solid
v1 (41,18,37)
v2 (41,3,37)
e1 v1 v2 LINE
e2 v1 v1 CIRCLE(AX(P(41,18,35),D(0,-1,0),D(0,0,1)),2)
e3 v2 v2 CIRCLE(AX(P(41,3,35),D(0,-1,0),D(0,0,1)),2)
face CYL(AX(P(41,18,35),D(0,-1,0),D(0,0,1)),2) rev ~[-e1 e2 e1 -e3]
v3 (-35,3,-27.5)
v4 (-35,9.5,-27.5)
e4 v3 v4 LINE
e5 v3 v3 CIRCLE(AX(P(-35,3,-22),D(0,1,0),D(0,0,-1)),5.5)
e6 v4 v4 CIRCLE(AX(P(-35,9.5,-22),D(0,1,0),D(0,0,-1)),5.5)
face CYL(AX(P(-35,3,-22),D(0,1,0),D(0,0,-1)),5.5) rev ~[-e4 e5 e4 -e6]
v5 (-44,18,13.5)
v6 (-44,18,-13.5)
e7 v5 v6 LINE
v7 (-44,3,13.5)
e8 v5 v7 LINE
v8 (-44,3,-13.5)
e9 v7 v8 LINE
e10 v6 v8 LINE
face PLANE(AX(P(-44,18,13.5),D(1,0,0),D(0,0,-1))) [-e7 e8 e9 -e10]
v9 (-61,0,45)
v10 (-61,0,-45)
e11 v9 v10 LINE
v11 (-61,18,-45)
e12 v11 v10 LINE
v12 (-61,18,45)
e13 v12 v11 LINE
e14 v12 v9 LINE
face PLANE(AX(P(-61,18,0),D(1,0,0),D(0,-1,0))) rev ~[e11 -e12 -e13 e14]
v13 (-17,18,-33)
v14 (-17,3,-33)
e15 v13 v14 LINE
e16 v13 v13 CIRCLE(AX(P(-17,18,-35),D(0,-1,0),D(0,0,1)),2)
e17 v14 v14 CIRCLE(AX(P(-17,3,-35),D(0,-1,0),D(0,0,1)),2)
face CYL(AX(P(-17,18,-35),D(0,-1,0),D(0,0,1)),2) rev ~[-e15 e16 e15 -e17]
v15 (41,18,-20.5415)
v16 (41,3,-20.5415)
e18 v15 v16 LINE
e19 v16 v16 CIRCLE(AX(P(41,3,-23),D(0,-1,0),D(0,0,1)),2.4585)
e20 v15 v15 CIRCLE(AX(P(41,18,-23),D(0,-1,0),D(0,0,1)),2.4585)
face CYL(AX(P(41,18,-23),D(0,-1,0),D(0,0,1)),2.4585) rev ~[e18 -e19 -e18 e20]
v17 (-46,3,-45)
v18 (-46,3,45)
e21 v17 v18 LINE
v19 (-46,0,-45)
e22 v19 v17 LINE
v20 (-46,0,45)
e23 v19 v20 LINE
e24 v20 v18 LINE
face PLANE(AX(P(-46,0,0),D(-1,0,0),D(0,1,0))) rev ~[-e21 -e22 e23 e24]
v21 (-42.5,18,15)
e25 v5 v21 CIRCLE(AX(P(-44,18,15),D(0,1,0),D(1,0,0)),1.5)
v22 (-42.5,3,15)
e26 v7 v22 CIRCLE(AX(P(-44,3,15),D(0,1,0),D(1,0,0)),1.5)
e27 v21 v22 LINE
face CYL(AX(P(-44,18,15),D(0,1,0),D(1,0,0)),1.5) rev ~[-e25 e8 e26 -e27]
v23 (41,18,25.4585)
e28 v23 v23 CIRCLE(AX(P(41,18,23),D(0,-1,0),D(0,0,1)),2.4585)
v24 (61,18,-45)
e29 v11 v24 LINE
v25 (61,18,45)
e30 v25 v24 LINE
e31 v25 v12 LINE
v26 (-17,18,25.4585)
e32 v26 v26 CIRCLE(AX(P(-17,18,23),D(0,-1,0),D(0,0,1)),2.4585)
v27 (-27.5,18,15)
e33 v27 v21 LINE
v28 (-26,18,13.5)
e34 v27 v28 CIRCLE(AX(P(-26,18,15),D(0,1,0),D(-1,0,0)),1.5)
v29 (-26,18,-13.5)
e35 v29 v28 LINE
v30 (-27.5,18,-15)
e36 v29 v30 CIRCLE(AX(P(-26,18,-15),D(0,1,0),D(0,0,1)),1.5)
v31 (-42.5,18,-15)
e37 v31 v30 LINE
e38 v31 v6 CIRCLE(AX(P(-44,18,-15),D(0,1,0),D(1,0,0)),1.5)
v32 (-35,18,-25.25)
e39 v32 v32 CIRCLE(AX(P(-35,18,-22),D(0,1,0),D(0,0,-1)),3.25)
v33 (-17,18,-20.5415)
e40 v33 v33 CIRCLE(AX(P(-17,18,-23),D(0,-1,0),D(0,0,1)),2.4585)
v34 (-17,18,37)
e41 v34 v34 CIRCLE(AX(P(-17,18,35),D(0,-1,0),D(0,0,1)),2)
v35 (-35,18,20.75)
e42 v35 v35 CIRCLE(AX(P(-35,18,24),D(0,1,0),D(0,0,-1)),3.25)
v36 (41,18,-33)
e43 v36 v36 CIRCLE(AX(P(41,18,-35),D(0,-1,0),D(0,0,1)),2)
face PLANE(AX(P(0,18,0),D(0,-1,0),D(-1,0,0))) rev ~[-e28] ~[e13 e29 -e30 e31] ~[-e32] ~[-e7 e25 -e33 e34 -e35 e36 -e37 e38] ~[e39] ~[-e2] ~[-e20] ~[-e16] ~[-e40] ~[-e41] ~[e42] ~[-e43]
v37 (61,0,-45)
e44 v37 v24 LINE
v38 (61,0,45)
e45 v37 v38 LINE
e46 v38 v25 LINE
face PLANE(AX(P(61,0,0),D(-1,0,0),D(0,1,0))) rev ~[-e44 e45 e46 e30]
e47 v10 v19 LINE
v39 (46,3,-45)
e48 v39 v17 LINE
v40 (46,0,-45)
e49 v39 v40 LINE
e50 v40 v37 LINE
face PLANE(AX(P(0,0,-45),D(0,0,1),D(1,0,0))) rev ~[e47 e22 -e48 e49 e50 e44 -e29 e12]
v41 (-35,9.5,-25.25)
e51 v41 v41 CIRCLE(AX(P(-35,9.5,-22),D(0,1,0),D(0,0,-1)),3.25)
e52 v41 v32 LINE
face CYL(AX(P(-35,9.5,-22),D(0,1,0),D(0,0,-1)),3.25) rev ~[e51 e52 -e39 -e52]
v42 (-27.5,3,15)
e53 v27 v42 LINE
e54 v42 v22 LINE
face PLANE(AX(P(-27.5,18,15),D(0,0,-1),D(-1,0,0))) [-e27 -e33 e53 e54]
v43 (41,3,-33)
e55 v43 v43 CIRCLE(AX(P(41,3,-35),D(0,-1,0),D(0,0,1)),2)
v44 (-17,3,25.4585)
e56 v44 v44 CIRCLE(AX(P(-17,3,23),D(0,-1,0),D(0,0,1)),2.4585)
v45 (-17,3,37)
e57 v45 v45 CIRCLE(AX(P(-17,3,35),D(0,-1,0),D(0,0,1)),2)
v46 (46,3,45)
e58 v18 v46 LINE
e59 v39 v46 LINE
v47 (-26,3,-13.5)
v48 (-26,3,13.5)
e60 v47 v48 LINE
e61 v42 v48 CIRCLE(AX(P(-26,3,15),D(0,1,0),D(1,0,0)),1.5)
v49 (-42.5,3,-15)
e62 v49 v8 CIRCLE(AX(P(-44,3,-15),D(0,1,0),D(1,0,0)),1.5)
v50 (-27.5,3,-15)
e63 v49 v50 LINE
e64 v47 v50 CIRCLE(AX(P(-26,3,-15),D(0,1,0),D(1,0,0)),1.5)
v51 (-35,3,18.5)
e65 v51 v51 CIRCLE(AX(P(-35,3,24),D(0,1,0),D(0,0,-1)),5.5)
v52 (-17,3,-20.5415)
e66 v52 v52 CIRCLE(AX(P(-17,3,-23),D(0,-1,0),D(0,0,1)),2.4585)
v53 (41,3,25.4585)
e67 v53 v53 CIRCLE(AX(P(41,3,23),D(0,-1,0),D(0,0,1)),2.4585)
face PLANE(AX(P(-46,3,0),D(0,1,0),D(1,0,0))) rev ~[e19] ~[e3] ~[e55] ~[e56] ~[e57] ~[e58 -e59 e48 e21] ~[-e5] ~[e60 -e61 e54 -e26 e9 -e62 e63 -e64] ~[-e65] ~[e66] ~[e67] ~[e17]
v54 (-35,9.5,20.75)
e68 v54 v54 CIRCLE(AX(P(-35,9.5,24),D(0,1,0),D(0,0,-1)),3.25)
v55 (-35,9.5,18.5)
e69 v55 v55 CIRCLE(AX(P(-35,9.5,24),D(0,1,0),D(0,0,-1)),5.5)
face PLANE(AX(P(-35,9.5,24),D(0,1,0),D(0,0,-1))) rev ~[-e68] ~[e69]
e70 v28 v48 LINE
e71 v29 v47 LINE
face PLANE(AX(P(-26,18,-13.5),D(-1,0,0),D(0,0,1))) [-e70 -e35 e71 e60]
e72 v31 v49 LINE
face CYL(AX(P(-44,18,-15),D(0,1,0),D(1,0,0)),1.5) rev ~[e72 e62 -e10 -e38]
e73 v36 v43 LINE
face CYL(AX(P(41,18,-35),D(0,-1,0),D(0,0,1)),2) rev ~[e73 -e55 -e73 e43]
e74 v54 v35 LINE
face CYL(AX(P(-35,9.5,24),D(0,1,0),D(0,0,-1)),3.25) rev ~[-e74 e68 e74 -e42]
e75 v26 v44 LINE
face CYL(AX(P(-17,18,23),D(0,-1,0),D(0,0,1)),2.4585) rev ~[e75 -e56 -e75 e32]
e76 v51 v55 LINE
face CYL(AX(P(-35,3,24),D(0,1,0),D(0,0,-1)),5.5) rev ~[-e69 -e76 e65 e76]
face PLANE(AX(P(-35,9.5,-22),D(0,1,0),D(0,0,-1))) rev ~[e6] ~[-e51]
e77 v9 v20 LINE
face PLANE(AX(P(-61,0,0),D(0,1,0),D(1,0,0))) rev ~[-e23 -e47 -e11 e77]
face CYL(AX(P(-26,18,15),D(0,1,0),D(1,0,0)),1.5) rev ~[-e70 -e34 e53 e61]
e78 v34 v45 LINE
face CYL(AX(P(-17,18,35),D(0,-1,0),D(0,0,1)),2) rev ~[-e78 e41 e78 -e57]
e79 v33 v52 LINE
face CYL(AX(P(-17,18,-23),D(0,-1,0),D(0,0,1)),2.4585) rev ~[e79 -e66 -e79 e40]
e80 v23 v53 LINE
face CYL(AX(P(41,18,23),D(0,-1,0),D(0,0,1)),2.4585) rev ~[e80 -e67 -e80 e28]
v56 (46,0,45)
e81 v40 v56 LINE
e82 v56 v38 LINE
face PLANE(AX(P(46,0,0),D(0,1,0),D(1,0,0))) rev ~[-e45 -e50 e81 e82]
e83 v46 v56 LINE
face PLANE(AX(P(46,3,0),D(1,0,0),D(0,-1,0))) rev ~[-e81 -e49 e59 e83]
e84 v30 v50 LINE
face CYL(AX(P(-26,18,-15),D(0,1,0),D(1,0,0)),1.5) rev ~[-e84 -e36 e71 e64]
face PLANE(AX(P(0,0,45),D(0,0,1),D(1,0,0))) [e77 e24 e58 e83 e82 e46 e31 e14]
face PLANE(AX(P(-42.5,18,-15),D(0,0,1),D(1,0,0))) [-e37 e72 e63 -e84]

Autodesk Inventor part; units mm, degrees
ref_plane "YZ Plane" through (0, 0, 0) normal (1, 0, 0) x (0, 1, 0)
ref_plane "XZ Plane" through (0, 0, 0) normal (0, 1, 0) x (-1, 0, 0)
ref_plane "XY Plane" through (0, 0, 0) normal (0, 0, 1) x (1, 0, 0)
sketch "Schizzo3" plane through (0, 0, 0) normal (0, 0, 1) x (1, 0, 0)
  line L0 (-46, 0) -> (-46, 3)
  line L1 (-46, 3) -> (46, 3)
  line L2 (46, 3) -> (46, 0)
  line L3 (46, 0) -> (61, 0)
  line L4 (61, 0) -> (61, 18)
  line L5 (61, 18) -> (-61, 18)
  line L6 (-61, 18) -> (-61, 0)
  line L7 (-61, 0) -> (-46, 0)
  line L8 (0, 0) -> (0, 18)
  point P0 (0, 3)
  dimension "d10" = 122
  dimension "d11" = 92
  dimension "d12" = 18
  dimension "d13" = 3
extrude "Estrusione1" add sketch "Schizzo3" along normal mid plane 90
sketch "Schizzo4" plane through (-61, 18, 45) normal (0, 1, 0) x (1, 0, 0)
  line L0 (0, 90) -> (0, 0) projected
  line L1 (0, 90) -> (122, 90) projected
  line L2 (17, 60) -> (35, 60)
  line L3 (35, 60) -> (35, 30)
  line L4 (35, 30) -> (17, 30)
  line L5 (17, 30) -> (17, 60)
  line L6 (0, 45) -> (122, 45) construction
  line L7 (122, 90) -> (122, 0) construction
  circle A0 centre (17, 60) radius 1.5
  circle A1 centre (35, 60) radius 1.5
  circle A2 centre (35, 30) radius 1.5
  circle A3 centre (17, 30) radius 1.5
  point P0 (61, 45)
  point P1 (26, 68)
  point P2 (44, 80)
  point P3 (44, 68)
  point P4 (102, 80)
  point P5 (102, 68)
  point P6 (18.5, 30)
  point P7 (33.5, 30)
  point P8 (35, 31.5)
  point P9 (35, 58.5)
  point P10 (33.5, 60)
  point P11 (18.5, 60)
  point P12 (17, 58.5)
  point P13 (17, 31.5)
  dimension "d17" = 17
  dimension "d18" = 30
  dimension "d19" = 18
  dimension "d20" = 30
  dimension "d22" = 35
  dimension "d23" = 102
  dimension "d24" = 23
  dimension "d25" = 44
  dimension "d26" = 26
  dimension "d27" = 3
  dimension "d28" = 3
  dimension "d29" = 3
  dimension "d30" = 3
extrude "Estrusione2" cut sketch "Schizzo4" against normal blind 90
hole "Foro1" at (41, 18, -23) at (-17, 18, -23) direction (0, -1, 0) diameter 4.917 end through all thread size "M6x1" class "6H" standard "ISO Metric profile"
hole "Foro2" at (41, 18, -35) at (-17, 18, -35) direction (0, -1, 0) diameter 4 end through all
pattern_linear "Serie rettangolare1" count 2 spacing 46 along (0, 0, 1) of "Foro1"
pattern_linear "Serie rettangolare2" count 2 spacing 70 along (0, 0, 1) of "Foro2"
sketch "Schizzo5" plane through (-46, 3, 45) normal (0, -1, 0) x (1, 0, 0)
  line L0 (-15, -90) -> (-15, 0) projected
  line L1 (92, -90) -> (0, -90) projected
  point P0 (46, -45)
  point P1 (11, -67)
  dimension "d54" = 26
  dimension "d55" = 23
hole "Foro3" at (-35, 3, -22) direction (0, 1, 0) diameter 6.5 end through all counterbore diameter 11 counterbore depth 6.5
pattern_linear "Serie rettangolare3" count 2 spacing 46 along (0, 0, 1) of "Foro3"
properties part number "05-15-2023 esercizi_iogna_serie"
